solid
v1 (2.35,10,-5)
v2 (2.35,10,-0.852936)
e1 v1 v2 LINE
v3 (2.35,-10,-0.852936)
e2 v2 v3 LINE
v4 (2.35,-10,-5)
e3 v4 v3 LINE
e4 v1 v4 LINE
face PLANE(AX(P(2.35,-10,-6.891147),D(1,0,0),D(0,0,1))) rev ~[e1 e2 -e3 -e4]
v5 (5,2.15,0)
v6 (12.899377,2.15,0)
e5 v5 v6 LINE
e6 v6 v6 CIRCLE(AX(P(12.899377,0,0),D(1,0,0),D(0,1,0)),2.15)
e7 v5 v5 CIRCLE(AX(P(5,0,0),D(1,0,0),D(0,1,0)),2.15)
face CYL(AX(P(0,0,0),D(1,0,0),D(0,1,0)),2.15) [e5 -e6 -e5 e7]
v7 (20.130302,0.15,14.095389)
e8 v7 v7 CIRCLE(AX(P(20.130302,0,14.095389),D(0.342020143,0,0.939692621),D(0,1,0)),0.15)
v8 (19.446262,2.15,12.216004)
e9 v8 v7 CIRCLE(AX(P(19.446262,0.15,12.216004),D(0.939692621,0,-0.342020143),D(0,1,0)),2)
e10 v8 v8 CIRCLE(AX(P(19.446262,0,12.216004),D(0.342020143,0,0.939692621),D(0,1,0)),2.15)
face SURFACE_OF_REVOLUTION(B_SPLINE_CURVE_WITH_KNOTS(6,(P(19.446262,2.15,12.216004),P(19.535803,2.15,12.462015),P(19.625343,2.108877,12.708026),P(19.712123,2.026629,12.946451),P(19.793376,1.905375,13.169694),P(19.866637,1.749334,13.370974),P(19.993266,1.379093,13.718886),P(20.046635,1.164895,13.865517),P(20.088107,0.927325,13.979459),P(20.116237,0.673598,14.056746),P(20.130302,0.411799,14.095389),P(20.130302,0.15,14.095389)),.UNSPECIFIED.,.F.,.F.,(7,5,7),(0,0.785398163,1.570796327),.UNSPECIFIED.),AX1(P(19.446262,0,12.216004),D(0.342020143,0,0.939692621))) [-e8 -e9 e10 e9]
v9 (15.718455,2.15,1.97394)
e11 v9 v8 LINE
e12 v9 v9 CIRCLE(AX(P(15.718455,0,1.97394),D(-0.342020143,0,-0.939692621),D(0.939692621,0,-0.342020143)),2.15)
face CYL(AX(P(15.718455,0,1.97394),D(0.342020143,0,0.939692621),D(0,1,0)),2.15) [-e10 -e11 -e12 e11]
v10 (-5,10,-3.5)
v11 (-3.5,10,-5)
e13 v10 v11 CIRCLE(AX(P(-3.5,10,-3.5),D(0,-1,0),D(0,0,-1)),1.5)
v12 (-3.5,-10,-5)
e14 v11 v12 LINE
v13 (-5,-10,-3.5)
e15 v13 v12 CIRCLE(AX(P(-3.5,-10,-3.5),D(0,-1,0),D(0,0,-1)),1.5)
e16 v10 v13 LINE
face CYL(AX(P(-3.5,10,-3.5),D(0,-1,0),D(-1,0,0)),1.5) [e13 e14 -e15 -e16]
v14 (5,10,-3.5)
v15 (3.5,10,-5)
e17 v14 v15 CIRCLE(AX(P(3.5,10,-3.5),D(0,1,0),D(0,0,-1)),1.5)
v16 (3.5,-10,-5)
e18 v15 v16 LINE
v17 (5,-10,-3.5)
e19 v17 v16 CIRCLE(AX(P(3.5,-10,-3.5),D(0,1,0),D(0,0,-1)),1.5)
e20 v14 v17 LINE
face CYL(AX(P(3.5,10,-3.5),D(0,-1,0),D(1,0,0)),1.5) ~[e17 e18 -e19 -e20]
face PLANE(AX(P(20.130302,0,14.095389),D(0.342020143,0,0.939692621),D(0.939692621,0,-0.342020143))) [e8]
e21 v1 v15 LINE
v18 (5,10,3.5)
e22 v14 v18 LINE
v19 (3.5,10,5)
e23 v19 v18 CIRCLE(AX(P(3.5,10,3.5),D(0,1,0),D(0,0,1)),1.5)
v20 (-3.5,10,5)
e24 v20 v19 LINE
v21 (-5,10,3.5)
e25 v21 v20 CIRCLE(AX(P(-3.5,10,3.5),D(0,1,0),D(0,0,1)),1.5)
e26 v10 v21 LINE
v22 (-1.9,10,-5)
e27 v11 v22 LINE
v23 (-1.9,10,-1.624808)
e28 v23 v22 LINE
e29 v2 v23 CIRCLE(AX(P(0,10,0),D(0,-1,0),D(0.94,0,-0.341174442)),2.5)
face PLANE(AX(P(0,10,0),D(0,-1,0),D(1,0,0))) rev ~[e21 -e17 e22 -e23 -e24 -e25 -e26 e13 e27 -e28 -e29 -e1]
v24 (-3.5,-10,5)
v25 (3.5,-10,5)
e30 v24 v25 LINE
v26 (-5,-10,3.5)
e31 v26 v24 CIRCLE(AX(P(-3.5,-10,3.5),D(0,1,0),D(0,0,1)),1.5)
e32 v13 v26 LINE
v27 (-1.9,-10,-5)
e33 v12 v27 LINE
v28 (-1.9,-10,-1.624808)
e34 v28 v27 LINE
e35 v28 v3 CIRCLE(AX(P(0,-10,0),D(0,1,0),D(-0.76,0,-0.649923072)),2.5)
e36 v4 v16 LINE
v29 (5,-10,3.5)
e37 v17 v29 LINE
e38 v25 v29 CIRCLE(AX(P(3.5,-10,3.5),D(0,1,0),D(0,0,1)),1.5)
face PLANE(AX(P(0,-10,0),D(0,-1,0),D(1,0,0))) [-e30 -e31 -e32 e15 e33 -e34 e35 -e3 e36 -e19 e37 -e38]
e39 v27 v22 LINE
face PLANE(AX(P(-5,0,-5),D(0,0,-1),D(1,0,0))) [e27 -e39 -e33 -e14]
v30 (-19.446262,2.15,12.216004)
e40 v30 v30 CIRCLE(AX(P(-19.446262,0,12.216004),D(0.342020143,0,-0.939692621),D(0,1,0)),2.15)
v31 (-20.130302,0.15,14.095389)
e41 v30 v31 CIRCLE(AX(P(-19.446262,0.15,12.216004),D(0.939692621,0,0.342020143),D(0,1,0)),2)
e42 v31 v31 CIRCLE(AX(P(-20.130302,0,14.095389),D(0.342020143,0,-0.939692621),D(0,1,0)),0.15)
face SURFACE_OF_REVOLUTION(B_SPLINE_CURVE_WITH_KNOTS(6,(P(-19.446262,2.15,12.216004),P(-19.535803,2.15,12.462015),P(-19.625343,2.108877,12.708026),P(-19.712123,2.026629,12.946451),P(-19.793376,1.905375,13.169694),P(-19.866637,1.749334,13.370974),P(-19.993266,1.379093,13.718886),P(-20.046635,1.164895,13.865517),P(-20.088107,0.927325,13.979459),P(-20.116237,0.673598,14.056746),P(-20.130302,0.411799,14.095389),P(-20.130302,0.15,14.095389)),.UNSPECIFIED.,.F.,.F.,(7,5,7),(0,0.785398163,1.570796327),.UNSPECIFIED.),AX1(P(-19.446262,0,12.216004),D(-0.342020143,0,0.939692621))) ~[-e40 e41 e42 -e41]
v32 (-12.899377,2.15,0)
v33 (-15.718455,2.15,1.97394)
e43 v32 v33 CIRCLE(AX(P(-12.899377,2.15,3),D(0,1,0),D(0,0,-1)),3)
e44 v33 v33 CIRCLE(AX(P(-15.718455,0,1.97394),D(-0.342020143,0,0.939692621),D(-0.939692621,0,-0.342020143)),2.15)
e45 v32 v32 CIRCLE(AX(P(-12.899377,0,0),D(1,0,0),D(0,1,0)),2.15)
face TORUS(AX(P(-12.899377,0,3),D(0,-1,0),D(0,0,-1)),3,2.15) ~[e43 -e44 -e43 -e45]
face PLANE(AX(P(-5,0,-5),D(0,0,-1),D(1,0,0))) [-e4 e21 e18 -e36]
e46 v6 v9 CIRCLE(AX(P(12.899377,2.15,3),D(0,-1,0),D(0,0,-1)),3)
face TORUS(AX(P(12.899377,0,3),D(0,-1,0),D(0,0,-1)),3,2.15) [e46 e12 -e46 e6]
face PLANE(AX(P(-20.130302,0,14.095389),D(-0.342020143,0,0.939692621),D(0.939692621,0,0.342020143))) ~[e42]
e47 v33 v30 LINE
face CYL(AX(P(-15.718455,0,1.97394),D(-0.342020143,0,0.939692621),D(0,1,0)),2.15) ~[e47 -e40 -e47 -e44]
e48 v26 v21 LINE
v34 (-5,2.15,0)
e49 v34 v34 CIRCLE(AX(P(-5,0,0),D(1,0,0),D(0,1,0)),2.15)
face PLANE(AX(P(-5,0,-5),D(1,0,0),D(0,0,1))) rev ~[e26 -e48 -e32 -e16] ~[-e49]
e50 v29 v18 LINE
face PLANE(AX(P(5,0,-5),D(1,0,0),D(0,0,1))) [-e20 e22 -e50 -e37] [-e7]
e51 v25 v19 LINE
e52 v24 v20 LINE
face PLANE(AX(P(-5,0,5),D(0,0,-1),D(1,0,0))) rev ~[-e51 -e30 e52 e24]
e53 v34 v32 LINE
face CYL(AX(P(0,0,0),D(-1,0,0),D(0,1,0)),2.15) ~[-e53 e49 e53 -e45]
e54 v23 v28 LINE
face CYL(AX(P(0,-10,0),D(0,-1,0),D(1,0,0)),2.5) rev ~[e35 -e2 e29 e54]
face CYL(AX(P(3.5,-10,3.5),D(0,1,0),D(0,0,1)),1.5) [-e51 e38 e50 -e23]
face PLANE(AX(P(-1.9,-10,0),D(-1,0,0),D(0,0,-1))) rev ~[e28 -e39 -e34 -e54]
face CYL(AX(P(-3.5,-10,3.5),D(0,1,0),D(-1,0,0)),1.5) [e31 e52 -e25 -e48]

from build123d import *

# Parameters (mm, degrees)
F0_W     = 10
F0_H     = 10
F1_DEPTH = 10
F4_R     = 2.15
F3_R     = 2.5
F7_DEPTH = 25
F8_W     = 4.25
F8_H     = 1.8911467679
F9_DEPTH = 63
F10_R    = 1.5
F11_R    = 2


# Not quite as in the source:
# - an extrude ends at something that could not be found from the text; its depth is read off the source's solid


with BuildPart() as f1:
    # F0 (on Front) → F1 (new body, symmetric)
    with BuildSketch(Plane.XZ):
        Rectangle(F0_W, F0_H)
    extrude(amount=F1_DEPTH, both=True)

    # F5: sweep along a path in F2
    with BuildLine(Plane.XZ) as f5_path:
        Line((0, 0), (12.8993773854, 0))
        ThreePointArc((12.8993773854, 0), (14.6201066944, 0.5425438671), (15.7184552477, 1.97393957))
        Line((15.7184552477, 1.97393957), (20.1303021499, 14.0953893118))
    # F4 (on face) → F5 (sweep)
    with BuildSketch(Plane.YZ.offset(5)):
        Circle(F4_R)
    sweep(path=f5_path.line)

    # F6: F1 across plane


with BuildPart() as f1_1:
    add(f1.part)
    add(f1.part.mirror(Plane.YZ))

    # F3 (on face) → F7 (cut)
    with BuildSketch(Plane.XZ.offset(10)):
        Circle(F3_R)
    extrude(amount=-F7_DEPTH, mode=Mode.SUBTRACT)

    # F8 (on face) → F9 (cut, through all)
    with BuildSketch(Plane.XZ.offset(10)):
        with Locations((0.225, -5.9455733839)):
            Rectangle(F8_W, F8_H)
        with BuildLine():
            Line((-1.9, -1.6248076809), (-1.9, -5))
            Line((-1.9, -5), (2.35, -5))
            Line((2.35, -5), (2.35, -0.8529361055))
            ThreePointArc((2.35, -0.8529361055), (0.4467341852, -2.4597618925), (-1.9, -1.6248076809))
        make_face()
        with BuildLine():
            Line((-1.9, 0), (-1.9, -1.6248076809))
            ThreePointArc((-1.9, -1.6248076809), (0.4467341852, -2.4597618925), (2.35, -0.8529361055))
            Line((2.35, -0.8529361055), (2.35, 0))
            Line((2.35, 0), (-1.9, 0))
        make_face()
    extrude(amount=-F9_DEPTH, mode=Mode.SUBTRACT)

    # F10
    f10_edges = [f1_1.edges().sort_by_distance(p)[0] for p in [
        (5, 0, 5),
        (-5, 0, 5),
        (5, 0, -5),
        (-5, 0, -5),
    ]]
    fillet(f10_edges, radius=F10_R)

    # F11
    f11_edges = [f1_1.edges().sort_by_distance(p)[0] for p in [
        (-20.130302, -2.15, 14.095389),
        (20.130302, -2.15, 14.095389),
    ]]
    fillet(f11_edges, radius=F11_R)


solid = f1_1.part
